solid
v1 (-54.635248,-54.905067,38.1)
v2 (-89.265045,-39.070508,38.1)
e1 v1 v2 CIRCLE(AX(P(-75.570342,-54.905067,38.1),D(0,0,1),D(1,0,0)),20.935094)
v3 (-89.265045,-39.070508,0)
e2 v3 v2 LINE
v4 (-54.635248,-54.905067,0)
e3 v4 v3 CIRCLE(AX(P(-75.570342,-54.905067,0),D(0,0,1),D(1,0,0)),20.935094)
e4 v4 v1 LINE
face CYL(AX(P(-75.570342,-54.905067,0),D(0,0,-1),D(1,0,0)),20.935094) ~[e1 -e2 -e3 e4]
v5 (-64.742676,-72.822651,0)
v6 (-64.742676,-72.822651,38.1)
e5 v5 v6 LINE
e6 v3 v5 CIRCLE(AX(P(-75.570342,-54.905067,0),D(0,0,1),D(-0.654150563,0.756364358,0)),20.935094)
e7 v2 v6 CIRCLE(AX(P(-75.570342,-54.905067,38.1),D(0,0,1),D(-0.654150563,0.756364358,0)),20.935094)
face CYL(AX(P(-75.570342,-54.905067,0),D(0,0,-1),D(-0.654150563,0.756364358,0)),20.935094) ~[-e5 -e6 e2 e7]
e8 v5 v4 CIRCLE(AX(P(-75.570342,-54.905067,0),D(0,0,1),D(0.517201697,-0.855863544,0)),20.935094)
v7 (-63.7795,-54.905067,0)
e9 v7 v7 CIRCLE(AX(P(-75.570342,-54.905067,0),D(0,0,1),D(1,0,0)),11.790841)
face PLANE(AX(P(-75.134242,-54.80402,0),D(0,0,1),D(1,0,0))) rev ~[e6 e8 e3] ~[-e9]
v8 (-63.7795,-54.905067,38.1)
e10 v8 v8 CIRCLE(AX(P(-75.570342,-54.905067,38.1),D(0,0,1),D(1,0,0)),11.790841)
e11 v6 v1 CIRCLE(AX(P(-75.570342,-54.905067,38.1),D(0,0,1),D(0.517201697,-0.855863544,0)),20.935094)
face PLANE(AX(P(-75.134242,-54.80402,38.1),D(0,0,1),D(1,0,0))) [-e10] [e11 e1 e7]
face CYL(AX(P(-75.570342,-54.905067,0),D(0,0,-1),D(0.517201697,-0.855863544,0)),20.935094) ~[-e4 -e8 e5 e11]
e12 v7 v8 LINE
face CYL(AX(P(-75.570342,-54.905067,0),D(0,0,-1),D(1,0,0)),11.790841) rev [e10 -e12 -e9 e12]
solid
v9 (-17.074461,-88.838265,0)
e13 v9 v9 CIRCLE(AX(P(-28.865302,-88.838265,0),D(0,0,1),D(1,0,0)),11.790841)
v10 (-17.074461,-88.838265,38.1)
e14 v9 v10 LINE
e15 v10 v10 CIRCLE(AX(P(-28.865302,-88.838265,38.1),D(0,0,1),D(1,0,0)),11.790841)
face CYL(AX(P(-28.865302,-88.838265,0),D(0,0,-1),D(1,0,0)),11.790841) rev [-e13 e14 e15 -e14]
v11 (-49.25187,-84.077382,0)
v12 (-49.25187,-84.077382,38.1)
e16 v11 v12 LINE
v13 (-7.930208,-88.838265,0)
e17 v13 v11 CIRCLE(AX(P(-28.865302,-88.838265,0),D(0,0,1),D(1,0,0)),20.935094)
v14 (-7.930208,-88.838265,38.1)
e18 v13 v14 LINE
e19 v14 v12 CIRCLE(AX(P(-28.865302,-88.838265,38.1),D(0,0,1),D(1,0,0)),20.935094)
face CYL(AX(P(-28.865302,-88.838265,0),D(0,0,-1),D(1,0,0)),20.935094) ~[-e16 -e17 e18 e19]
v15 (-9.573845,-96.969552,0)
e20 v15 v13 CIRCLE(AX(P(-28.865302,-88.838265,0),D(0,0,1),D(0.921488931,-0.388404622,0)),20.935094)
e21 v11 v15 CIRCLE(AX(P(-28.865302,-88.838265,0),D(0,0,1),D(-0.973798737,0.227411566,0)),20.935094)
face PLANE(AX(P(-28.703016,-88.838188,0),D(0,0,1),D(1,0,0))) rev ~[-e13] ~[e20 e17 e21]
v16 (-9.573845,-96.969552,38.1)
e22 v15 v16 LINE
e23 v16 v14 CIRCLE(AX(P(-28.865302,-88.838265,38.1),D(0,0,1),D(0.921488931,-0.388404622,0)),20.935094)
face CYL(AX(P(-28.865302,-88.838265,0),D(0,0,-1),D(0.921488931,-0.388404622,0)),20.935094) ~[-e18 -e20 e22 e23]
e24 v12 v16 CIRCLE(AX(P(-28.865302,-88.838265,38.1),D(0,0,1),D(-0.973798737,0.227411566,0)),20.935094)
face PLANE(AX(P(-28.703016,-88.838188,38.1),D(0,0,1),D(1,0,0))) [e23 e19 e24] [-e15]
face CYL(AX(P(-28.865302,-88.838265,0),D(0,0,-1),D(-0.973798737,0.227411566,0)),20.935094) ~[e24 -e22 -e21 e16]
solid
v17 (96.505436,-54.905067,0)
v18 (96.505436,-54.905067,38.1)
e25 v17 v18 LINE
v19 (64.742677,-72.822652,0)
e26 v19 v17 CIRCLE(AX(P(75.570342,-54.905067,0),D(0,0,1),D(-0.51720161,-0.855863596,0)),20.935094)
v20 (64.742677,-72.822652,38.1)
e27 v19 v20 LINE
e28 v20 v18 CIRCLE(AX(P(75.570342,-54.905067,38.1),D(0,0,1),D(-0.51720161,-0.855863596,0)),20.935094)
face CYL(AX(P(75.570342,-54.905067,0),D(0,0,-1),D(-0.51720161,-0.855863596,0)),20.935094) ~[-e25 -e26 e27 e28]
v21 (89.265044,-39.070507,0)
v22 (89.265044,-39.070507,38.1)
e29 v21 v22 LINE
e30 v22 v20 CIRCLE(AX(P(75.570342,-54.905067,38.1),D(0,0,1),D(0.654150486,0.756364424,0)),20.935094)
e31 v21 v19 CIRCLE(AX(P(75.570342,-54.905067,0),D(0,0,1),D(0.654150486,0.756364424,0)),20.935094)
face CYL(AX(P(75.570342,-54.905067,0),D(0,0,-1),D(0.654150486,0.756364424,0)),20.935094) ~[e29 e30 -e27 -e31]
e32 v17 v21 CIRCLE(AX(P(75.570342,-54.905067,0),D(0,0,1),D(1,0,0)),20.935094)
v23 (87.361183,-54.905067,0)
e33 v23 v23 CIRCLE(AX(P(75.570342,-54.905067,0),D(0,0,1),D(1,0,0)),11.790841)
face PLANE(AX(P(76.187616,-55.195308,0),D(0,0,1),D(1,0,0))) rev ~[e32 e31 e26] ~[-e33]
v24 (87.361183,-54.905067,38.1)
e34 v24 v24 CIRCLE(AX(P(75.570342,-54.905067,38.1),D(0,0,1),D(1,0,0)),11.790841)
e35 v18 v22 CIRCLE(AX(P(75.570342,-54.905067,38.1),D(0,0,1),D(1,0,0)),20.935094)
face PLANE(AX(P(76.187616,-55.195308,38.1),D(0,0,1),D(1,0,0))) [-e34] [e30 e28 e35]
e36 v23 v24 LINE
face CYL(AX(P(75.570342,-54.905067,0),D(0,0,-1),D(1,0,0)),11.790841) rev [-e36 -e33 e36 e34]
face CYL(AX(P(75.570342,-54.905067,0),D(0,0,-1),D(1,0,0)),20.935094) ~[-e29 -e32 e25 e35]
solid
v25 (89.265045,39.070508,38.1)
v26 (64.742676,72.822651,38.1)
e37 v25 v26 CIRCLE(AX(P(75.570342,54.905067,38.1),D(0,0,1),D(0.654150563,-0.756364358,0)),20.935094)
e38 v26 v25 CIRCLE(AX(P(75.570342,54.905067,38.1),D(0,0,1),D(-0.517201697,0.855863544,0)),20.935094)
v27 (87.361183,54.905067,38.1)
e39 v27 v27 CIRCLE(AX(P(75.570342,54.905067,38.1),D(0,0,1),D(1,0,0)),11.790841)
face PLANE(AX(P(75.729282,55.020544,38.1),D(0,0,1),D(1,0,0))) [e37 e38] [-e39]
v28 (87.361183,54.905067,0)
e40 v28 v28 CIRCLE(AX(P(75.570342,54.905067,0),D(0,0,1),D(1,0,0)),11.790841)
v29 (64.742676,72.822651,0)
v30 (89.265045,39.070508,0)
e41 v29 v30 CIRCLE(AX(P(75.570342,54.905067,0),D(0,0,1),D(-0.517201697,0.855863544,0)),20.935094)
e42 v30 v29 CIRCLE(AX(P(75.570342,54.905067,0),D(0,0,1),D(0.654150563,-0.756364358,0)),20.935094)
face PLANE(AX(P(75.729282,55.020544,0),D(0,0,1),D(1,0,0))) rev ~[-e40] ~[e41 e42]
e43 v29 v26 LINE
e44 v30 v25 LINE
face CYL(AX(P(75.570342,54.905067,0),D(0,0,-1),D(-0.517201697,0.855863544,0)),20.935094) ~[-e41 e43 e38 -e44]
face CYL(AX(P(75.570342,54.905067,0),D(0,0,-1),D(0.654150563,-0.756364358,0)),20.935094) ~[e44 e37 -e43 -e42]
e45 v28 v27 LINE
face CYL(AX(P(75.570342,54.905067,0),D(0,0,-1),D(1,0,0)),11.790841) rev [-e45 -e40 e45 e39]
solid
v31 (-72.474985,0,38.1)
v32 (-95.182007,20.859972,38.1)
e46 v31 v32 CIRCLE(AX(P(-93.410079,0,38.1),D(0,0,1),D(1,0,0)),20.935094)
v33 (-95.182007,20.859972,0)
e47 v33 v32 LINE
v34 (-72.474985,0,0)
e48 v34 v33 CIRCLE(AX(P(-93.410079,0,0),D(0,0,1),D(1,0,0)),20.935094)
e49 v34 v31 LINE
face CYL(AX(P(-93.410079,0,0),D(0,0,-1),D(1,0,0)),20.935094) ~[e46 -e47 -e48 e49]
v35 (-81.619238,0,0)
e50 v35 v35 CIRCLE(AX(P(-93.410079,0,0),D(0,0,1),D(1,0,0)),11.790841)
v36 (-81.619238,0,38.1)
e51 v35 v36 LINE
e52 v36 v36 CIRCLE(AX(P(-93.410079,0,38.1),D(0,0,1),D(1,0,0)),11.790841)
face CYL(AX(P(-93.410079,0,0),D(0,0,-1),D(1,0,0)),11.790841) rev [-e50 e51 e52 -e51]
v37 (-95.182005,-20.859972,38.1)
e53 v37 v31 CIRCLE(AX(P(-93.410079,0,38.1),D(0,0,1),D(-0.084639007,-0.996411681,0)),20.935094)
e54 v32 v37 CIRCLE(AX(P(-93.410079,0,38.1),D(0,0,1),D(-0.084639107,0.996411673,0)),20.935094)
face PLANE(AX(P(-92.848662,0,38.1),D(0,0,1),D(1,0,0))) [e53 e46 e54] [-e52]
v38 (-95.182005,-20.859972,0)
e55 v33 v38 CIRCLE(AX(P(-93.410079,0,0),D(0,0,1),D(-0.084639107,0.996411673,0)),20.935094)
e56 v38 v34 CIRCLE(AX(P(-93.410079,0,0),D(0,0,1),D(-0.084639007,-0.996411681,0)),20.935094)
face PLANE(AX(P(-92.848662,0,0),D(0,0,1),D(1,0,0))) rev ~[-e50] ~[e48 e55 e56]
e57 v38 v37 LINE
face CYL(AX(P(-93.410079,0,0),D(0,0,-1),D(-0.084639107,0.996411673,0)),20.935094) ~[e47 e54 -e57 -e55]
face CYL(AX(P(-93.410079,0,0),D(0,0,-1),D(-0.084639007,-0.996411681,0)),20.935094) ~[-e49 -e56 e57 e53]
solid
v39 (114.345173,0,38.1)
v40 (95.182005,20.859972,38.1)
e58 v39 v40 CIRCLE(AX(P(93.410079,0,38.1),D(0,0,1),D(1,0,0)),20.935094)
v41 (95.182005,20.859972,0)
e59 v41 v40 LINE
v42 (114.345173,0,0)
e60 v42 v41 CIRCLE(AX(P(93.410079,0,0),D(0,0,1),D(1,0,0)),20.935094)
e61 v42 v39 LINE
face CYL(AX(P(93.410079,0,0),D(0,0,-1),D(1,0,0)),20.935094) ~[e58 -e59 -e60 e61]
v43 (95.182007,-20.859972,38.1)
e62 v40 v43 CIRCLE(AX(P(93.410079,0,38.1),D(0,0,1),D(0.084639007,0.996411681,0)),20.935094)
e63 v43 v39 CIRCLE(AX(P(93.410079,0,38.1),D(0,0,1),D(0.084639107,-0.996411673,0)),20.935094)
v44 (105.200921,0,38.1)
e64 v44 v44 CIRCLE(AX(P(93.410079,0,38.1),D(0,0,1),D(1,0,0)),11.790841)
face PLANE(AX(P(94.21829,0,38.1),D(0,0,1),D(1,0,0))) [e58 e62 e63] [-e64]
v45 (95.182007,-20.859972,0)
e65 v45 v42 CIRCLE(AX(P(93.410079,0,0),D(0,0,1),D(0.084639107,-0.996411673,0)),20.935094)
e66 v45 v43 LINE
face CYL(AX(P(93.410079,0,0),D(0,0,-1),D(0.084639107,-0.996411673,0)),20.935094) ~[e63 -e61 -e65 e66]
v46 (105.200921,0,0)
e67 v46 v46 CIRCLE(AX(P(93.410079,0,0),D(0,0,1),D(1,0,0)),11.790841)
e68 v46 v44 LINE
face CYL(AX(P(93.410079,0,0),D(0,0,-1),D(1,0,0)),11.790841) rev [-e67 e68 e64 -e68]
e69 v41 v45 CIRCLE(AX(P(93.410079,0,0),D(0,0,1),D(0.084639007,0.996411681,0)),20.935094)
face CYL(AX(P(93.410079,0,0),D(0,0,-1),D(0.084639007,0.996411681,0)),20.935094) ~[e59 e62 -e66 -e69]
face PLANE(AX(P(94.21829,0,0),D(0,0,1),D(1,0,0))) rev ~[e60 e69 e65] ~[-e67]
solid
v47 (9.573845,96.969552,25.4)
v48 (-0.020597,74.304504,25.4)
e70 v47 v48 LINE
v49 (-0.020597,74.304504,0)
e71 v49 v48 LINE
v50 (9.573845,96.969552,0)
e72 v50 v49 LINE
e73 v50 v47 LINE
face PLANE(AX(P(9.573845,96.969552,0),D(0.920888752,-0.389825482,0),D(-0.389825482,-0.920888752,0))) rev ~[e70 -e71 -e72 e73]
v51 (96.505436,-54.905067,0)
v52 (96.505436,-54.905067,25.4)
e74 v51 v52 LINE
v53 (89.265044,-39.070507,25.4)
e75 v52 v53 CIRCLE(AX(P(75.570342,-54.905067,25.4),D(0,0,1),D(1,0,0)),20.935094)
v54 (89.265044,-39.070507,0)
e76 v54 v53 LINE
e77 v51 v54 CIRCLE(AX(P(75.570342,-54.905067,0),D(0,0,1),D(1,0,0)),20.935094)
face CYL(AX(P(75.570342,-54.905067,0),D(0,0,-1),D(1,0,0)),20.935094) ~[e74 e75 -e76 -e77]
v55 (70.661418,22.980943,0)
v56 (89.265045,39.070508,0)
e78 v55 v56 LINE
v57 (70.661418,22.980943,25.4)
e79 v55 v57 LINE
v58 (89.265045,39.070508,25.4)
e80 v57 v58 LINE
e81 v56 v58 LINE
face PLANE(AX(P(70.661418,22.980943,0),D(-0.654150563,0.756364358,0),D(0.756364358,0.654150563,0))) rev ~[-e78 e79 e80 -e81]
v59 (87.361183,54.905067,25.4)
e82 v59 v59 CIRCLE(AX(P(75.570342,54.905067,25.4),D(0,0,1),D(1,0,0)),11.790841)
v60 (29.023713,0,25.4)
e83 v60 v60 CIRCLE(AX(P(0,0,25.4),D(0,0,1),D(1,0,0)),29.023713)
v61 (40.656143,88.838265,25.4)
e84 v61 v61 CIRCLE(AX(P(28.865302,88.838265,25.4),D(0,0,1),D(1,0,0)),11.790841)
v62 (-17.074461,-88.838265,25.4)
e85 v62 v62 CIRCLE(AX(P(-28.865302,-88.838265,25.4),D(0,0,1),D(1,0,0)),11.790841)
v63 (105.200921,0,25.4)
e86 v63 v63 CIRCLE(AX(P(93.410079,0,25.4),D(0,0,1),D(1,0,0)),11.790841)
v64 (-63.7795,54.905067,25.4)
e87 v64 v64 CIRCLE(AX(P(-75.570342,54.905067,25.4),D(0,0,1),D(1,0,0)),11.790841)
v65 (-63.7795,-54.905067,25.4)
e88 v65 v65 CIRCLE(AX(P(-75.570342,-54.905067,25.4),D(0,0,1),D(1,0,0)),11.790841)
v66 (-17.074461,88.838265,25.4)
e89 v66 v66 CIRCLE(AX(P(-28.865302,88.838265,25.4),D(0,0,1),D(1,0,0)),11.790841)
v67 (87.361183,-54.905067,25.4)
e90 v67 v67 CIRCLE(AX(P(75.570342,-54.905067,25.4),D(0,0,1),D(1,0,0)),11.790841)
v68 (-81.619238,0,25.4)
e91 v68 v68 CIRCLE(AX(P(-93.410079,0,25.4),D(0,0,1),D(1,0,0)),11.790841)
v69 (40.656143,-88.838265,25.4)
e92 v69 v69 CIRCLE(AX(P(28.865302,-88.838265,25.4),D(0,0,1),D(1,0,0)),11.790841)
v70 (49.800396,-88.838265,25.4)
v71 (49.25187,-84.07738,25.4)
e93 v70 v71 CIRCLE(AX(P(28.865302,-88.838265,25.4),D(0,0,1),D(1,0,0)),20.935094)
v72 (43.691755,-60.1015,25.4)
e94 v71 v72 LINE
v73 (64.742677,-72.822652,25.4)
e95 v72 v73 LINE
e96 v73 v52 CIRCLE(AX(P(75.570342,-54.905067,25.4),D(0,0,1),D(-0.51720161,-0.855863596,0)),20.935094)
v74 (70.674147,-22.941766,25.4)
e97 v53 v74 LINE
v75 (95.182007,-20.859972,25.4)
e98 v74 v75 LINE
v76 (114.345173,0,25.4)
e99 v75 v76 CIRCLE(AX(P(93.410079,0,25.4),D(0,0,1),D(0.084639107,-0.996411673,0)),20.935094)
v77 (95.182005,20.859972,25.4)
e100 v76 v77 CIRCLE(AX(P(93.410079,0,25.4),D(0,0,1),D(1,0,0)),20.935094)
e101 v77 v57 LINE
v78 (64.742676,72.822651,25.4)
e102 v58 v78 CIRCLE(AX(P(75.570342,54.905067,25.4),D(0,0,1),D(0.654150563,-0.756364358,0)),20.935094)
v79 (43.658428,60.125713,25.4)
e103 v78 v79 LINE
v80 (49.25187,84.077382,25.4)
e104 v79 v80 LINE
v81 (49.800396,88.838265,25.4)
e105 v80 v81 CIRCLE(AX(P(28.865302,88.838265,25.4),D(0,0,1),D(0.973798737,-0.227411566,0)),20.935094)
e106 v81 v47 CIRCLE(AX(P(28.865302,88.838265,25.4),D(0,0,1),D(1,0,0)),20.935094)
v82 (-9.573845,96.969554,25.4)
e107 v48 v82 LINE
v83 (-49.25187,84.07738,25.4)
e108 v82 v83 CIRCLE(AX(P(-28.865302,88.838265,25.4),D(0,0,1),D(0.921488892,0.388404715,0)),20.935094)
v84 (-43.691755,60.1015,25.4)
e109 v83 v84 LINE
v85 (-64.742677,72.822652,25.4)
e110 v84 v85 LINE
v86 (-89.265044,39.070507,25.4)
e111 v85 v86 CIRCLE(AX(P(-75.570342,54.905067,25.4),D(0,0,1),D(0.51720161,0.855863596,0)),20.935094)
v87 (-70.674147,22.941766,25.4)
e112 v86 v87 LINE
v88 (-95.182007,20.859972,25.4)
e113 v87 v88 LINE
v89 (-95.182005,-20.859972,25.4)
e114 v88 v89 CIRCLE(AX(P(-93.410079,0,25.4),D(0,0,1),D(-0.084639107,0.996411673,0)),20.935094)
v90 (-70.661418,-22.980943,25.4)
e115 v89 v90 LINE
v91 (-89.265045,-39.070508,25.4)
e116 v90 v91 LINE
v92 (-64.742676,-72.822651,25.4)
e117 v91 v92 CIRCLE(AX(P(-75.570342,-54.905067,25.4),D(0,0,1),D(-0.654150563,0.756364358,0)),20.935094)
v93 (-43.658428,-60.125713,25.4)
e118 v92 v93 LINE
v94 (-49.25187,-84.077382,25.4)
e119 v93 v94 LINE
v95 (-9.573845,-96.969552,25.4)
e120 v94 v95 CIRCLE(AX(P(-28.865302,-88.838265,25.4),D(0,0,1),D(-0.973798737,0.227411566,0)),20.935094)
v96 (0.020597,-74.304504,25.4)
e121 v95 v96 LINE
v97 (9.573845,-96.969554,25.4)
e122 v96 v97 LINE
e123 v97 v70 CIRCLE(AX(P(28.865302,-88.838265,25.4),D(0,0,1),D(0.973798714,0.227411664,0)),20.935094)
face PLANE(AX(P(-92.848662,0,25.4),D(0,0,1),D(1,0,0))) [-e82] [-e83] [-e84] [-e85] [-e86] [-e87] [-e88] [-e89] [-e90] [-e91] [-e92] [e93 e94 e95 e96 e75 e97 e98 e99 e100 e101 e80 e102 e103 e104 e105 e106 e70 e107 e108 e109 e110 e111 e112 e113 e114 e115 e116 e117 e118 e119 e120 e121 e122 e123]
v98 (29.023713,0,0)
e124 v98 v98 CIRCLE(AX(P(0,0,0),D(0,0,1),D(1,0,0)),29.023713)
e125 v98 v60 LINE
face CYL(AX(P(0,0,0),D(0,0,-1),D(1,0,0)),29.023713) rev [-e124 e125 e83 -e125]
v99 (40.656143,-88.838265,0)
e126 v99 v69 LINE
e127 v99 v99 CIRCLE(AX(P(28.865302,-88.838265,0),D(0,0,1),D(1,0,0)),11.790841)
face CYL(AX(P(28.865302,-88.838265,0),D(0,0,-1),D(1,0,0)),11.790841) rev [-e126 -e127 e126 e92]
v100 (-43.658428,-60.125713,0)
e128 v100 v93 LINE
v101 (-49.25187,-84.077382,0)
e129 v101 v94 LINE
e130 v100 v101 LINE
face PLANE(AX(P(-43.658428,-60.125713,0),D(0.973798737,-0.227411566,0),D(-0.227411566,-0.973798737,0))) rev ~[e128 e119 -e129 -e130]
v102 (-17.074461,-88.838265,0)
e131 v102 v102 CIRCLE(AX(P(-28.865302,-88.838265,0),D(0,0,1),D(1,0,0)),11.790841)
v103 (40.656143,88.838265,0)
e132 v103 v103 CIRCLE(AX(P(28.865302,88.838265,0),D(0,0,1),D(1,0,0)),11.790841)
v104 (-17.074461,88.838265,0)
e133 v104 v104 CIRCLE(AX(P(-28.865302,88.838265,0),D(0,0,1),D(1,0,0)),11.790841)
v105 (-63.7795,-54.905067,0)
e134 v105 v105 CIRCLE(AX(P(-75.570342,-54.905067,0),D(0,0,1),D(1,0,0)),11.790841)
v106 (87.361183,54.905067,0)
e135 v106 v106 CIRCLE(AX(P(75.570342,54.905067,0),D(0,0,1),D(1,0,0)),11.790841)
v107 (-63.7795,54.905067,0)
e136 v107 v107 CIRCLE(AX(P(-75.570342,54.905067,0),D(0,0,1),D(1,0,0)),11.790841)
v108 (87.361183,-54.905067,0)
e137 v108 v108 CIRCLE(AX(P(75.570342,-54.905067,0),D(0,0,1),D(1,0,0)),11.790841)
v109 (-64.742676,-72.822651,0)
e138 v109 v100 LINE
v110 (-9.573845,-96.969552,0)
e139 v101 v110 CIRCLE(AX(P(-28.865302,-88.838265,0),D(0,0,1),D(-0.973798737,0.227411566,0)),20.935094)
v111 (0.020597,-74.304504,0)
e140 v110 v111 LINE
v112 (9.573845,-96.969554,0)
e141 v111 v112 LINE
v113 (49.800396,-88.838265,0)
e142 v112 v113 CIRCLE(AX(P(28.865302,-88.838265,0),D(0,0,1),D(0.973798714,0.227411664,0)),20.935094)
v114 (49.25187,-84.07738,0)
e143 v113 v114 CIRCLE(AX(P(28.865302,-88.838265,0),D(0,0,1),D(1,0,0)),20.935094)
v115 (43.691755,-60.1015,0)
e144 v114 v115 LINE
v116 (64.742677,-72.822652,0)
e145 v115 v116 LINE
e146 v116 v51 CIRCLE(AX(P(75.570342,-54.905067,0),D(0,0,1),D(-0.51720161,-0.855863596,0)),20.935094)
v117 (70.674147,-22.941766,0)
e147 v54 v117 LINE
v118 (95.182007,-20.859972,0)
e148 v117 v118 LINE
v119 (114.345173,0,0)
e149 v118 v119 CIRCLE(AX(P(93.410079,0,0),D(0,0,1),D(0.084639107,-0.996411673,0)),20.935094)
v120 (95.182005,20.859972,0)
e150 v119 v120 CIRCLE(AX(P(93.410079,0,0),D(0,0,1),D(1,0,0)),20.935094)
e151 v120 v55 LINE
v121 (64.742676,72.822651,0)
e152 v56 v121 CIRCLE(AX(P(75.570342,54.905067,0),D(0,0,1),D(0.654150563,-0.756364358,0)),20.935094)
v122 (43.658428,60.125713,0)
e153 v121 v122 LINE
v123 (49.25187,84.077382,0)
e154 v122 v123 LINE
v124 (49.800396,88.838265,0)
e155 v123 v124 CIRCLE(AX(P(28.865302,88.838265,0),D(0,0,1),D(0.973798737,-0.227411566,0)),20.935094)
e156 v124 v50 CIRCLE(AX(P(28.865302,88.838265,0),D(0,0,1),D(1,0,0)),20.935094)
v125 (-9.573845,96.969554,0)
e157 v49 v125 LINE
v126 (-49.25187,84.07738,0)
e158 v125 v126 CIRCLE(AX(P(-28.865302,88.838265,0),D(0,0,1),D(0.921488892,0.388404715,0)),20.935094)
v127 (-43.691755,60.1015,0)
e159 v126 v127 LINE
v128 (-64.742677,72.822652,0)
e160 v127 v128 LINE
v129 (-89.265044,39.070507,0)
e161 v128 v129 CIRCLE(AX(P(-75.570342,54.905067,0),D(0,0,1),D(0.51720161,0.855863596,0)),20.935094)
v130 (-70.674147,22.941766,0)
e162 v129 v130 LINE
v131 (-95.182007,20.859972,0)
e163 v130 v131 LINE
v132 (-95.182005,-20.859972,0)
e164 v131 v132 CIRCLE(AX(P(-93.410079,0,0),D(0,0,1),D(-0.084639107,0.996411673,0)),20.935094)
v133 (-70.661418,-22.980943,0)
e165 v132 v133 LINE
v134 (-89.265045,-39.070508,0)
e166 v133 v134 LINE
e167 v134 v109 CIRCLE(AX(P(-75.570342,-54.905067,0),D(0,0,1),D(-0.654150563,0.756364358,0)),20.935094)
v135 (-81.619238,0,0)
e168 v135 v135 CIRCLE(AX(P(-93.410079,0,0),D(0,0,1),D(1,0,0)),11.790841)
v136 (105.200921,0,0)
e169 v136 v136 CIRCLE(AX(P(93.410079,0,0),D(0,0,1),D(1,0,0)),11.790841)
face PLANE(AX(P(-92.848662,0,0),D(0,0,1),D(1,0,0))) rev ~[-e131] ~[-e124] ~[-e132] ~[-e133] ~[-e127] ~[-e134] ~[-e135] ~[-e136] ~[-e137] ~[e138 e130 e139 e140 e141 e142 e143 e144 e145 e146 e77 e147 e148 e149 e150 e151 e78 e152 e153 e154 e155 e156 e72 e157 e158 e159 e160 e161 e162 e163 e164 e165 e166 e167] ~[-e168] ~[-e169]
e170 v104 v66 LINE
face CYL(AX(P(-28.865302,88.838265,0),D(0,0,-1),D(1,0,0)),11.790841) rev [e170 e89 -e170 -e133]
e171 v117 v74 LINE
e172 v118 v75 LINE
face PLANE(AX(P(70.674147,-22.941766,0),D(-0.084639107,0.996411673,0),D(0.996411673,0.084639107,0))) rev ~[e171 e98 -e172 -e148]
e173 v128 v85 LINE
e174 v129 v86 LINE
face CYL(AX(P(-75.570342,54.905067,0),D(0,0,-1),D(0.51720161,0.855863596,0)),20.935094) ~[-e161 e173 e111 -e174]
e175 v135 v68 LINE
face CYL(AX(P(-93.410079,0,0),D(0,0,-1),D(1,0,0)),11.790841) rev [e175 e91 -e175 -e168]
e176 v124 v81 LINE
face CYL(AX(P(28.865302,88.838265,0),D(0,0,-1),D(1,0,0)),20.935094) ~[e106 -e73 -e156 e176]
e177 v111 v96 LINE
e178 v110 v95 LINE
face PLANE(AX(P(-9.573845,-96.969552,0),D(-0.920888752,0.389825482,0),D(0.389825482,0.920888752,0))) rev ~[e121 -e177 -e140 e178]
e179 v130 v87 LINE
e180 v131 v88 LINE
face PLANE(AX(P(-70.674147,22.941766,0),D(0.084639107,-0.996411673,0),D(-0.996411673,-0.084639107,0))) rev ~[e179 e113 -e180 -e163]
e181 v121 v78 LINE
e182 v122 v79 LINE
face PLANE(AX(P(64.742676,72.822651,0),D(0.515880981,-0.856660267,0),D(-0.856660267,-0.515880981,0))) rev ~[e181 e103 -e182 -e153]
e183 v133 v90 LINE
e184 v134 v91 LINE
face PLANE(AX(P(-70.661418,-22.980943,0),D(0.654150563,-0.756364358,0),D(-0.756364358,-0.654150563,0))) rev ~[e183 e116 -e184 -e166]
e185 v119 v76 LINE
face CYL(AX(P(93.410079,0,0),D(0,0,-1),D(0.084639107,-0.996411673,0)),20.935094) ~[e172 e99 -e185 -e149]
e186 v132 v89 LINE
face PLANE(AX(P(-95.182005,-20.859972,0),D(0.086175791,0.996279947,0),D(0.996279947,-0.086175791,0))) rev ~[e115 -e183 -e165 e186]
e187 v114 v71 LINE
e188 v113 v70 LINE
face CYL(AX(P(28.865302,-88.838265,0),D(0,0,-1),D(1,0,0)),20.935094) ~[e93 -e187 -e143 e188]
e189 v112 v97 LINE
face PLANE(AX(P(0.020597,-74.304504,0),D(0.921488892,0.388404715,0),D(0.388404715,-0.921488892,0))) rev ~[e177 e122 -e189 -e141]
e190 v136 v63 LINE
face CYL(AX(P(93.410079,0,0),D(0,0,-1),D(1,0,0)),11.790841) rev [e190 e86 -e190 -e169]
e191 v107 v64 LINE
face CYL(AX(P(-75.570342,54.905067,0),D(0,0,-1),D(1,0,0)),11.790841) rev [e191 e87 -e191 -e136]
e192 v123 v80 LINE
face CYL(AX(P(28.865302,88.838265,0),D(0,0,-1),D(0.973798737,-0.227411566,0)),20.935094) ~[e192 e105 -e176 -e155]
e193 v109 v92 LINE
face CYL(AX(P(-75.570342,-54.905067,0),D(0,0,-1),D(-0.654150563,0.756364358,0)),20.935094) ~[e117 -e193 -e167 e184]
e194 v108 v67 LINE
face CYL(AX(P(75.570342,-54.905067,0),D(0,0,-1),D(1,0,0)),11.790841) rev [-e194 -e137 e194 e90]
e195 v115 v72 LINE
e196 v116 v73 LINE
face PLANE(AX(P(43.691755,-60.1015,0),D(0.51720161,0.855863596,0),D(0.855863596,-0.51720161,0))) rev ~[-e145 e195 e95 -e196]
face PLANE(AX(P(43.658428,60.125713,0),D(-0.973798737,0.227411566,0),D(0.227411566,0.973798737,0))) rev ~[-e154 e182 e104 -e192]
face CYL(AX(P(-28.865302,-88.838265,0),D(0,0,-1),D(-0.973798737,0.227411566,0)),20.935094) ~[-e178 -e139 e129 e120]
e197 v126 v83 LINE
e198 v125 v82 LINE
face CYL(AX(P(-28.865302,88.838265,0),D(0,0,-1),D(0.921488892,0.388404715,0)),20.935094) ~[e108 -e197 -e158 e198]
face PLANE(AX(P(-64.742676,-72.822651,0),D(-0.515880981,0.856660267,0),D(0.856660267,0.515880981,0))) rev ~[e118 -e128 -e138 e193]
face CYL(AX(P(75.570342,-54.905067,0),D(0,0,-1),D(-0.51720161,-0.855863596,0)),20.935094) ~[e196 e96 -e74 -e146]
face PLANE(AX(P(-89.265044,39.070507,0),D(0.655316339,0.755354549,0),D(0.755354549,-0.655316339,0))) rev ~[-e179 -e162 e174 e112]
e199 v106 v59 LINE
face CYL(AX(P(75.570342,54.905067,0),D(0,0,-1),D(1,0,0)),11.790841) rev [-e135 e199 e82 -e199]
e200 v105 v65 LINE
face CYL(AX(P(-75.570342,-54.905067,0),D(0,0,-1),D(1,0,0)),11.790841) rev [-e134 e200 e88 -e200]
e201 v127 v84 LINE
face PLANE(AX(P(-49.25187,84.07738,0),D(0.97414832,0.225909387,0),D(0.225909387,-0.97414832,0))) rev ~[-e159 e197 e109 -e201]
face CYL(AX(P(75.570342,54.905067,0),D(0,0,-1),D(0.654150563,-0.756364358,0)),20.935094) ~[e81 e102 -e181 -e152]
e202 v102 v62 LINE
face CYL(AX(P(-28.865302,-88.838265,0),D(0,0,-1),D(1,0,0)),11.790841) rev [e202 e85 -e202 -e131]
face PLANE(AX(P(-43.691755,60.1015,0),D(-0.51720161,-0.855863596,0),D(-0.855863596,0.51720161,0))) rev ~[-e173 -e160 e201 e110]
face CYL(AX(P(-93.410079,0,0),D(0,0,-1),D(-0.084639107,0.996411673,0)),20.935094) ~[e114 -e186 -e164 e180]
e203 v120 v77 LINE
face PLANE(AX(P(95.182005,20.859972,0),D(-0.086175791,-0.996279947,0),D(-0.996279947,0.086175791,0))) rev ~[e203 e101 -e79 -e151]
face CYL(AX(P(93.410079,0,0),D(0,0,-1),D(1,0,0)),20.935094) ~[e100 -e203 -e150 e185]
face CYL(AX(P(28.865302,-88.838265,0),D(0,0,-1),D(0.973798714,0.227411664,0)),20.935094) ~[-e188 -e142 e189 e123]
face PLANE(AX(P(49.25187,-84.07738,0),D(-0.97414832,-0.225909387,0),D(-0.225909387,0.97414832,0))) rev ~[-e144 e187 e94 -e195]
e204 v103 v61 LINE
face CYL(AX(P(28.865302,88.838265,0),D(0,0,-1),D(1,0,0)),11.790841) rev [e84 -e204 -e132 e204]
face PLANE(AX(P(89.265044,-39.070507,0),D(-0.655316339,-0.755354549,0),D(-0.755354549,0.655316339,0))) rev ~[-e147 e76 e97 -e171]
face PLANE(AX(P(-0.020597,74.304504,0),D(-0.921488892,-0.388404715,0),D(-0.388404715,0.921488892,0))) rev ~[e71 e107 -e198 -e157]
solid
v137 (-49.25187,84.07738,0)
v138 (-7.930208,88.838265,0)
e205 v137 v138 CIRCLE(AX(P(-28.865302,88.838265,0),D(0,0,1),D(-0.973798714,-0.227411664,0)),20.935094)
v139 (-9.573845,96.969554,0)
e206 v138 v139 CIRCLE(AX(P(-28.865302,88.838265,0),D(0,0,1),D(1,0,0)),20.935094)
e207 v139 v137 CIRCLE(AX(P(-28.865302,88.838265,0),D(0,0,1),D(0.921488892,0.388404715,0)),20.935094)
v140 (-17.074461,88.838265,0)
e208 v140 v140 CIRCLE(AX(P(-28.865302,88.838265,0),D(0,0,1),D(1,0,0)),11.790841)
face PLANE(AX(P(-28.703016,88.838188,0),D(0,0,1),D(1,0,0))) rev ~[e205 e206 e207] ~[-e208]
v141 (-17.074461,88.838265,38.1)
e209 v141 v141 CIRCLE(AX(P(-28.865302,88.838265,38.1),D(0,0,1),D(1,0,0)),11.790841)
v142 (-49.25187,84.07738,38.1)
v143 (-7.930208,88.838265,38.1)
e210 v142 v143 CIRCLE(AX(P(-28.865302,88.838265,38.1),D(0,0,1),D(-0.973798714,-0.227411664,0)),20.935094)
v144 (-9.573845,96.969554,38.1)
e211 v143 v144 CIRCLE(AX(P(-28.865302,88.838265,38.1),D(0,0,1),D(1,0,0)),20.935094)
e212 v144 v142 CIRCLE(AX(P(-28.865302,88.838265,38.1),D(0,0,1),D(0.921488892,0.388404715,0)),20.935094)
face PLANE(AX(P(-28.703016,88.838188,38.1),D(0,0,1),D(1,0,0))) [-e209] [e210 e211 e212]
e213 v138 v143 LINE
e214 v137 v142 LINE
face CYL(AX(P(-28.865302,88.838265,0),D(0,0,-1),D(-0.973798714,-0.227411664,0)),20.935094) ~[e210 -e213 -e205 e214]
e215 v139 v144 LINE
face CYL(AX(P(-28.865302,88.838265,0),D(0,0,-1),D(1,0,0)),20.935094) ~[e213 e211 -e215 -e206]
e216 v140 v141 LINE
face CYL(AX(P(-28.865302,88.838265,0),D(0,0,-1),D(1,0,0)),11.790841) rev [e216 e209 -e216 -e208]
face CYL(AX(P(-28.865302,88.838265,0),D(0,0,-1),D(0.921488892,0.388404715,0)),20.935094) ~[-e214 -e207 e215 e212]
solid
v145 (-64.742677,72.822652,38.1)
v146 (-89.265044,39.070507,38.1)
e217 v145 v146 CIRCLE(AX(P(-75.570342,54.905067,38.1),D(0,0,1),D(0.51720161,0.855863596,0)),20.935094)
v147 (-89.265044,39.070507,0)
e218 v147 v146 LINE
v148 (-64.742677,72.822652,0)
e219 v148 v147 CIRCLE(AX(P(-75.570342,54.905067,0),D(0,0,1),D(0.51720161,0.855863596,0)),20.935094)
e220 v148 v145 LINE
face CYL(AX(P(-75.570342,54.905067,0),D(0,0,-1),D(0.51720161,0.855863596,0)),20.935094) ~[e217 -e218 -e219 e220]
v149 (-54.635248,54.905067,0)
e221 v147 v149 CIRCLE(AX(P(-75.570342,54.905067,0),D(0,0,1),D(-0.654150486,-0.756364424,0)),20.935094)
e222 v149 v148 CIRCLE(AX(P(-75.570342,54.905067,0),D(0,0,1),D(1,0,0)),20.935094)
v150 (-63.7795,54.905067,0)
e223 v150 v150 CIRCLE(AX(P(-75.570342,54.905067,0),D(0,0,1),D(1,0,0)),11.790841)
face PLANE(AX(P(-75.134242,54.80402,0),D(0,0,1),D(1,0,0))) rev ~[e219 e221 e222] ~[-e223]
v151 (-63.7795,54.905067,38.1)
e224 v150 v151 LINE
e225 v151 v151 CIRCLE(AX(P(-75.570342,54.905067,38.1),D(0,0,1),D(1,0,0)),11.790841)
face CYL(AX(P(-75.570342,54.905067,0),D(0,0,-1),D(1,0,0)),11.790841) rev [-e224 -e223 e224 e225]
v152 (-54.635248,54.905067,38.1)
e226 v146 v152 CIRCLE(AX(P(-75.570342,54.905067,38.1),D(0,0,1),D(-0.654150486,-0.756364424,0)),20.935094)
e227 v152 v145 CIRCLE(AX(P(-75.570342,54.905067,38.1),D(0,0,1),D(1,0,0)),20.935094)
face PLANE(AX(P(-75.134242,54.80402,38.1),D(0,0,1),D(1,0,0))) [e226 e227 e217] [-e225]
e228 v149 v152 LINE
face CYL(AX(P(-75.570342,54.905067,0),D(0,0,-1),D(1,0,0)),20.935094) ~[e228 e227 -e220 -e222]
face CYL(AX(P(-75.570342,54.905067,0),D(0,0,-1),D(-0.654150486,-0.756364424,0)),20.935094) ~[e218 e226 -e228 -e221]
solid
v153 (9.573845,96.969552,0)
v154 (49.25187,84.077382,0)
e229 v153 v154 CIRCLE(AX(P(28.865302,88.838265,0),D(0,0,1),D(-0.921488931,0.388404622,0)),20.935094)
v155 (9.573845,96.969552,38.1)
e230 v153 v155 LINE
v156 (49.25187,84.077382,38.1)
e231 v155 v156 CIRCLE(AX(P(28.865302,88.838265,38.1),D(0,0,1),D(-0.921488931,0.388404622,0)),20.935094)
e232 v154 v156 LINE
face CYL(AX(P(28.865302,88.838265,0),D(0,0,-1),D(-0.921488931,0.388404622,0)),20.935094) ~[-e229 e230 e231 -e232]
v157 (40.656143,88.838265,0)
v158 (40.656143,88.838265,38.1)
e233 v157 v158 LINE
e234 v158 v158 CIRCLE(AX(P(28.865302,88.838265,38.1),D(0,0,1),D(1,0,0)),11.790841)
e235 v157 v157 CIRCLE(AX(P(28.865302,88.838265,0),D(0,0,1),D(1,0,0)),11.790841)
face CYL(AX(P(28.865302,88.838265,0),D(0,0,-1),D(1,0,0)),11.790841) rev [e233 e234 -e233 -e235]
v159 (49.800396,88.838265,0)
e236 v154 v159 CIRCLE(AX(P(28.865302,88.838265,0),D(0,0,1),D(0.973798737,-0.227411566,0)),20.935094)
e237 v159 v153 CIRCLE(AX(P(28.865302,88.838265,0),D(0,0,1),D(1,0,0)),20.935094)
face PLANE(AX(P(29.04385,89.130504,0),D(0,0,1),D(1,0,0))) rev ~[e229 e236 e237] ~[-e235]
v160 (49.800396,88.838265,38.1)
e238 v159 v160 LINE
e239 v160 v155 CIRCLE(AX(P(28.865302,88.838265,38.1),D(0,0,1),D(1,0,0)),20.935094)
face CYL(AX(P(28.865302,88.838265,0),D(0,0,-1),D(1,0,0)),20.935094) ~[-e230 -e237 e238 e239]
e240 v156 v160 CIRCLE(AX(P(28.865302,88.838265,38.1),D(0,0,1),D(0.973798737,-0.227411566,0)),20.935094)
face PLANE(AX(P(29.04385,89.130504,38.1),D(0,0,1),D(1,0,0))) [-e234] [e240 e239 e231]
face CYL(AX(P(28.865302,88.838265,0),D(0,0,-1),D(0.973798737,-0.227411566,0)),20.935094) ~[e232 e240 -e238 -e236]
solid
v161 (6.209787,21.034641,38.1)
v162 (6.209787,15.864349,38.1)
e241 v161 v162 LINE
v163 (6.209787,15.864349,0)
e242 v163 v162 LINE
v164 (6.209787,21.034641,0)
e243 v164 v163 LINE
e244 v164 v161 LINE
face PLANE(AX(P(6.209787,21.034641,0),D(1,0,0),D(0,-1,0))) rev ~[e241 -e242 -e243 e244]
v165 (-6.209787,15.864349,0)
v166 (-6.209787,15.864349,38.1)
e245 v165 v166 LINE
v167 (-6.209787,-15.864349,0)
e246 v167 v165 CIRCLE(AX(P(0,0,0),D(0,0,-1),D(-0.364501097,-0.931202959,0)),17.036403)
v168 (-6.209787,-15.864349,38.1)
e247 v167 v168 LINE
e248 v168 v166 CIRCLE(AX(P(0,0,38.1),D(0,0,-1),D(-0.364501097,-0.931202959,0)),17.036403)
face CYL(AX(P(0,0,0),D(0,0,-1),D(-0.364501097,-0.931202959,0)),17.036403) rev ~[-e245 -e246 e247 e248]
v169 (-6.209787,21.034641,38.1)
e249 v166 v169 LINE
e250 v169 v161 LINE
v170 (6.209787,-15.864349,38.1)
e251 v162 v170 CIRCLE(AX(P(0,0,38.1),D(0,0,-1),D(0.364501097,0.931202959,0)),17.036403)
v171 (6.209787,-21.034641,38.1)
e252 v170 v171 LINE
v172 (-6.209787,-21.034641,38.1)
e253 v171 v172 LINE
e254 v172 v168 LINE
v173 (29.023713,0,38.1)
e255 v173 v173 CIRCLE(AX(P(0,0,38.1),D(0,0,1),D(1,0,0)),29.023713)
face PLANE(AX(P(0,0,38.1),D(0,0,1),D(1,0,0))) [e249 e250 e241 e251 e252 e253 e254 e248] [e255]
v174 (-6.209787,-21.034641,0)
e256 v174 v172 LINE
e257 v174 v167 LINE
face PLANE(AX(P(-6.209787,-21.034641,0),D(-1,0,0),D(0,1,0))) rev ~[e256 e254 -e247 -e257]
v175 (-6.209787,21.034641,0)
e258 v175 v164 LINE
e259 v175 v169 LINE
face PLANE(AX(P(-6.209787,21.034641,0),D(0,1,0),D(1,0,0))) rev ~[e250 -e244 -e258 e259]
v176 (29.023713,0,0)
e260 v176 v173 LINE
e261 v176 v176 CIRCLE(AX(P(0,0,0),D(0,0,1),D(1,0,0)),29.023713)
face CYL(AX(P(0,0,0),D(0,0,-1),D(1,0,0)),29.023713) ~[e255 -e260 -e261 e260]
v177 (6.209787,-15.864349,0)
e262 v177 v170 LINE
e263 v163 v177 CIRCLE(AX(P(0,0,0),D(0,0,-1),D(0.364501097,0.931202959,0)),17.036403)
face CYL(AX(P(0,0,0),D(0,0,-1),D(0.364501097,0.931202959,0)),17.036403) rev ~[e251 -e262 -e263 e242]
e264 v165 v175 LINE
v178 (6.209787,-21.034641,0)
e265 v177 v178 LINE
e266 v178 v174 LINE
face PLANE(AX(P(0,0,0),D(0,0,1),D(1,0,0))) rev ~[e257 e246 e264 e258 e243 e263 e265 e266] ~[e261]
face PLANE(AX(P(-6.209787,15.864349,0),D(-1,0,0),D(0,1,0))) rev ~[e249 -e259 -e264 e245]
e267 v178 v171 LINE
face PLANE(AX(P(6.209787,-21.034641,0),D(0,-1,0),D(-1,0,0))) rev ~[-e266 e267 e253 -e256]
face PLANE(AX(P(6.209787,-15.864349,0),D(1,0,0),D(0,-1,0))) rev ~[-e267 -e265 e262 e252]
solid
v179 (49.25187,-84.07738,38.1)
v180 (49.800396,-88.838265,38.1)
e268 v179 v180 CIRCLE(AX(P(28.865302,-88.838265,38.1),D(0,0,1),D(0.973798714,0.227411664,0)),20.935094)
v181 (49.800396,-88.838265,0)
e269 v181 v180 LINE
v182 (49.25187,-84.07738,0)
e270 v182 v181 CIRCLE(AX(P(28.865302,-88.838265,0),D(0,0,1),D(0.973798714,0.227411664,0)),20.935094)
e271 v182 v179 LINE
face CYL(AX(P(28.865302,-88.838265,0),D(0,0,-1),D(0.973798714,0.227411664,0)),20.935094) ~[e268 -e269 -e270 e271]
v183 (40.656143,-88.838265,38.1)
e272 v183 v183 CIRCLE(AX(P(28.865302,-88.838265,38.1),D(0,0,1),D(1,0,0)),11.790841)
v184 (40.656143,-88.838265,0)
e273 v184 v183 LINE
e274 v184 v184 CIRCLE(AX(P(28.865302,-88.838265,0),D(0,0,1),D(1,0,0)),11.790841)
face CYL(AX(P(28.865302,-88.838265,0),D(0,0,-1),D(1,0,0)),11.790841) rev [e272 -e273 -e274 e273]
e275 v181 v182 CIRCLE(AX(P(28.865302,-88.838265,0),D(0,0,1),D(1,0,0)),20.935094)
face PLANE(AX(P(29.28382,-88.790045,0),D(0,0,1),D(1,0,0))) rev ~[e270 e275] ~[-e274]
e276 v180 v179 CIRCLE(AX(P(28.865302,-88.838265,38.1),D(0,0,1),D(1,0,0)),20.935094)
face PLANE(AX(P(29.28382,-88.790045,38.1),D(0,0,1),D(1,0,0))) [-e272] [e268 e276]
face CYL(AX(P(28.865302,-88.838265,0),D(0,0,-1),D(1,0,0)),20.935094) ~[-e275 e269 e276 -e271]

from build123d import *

# Parameters (mm, degrees)
F0_R     = 11.7908412462
F1_DEPTH = 38.1
F0_R_2   = 29.023712578
F2_DEPTH = 25.4


# Not quite as in the source:
# - ends of sketch curves that miss each other by under 0.0002 mm in the source are joined


with BuildPart() as f1:
    # F0 (on Top) → F1 (new body)
    with BuildSketch(Plane.XY):
        with BuildLine():
            ThreePointArc((-64.7426773936, 72.8226518828), (-92.507189101, 67.2104057225), (-89.2650435852, 39.0705068284))
            ThreePointArc((-89.2650435852, 39.0705068284), (-66.8646456266, 35.8659228211), (-54.6352477424, 54.9050670968))
            ThreePointArc((-54.6352477424, 54.9050670968), (-57.3363579251, 65.1909795347), (-64.7426773936, 72.8226518828))
        make_face()
        with Locations((-75.5703416943, 54.9050670968)):
            Circle(F0_R, mode=Mode.SUBTRACT)
    extrude(amount=F1_DEPTH)


with BuildPart() as f1b:
    # F0 (on Top) → F1, piece 2 (new body)
    with BuildSketch(Plane.XY):
        with BuildLine():
            ThreePointArc((-95.1820049773, -20.8599721616), (-79.2470513034, -15.4170941953), (-72.4749854651, 0))
            ThreePointArc((-72.4749854651, 0), (-79.2470520813, 15.4170949099), (-95.1820070823, 20.8599719828))
            ThreePointArc((-95.1820070823, 20.8599719828), (-114.3451733689, -1.0563e-06), (-95.1820049773, -20.8599721616))
        make_face()
        with Locations((-93.410079417, 0)):
            Circle(F0_R, mode=Mode.SUBTRACT)
    extrude(amount=F1_DEPTH)


with BuildPart() as f1c:
    # F0 (on Top) → F1, piece 3 (new body)
    with BuildSketch(Plane.XY):
        with BuildLine():
            ThreePointArc((-54.6352477424, -54.9050670968), (-66.8646465872, -35.8659223818), (-89.265045183, -39.0705082103))
            ThreePointArc((-89.265045183, -39.0705082103), (-92.5071878593, -67.2104074316), (-64.7426755855, -72.8226507902))
            ThreePointArc((-64.7426755855, -72.8226507902), (-57.3363574061, -65.1909786147), (-54.6352477424, -54.9050670968))
        make_face()
        with Locations((-75.5703416943, -54.9050670968)):
            Circle(F0_R, mode=Mode.SUBTRACT)
    extrude(amount=F1_DEPTH)


with BuildPart() as f1d:
    # F0 (on Top) → F1, piece 4 (new body)
    with BuildSketch(Plane.XY):
        with BuildLine():
            ThreePointArc((-7.9302080339, -88.8382647172), (-26.4691132006, -68.0407543354), (-49.2518700311, -84.0773822248))
            ThreePointArc((-49.2518700311, -84.0773822248), (-35.3346007911, -108.7487225658), (-9.5738446427, -96.9695519678))
            ThreePointArc((-9.5738446427, -96.9695519678), (-8.3452309489, -92.9861368721), (-7.9302080339, -88.8382647172))
        make_face()
        with Locations((-28.8653019858, -88.8382647172)):
            Circle(F0_R, mode=Mode.SUBTRACT)
    extrude(amount=F1_DEPTH)


with BuildPart() as f1e:
    # F0 (on Top) → F1, piece 5 (new body)
    with BuildSketch(Plane.XY):
        with BuildLine():
            ThreePointArc((49.2518695507, -84.0773801676), (22.3960011712, -68.9278075214), (9.5738454632, -96.9695539146))
            ThreePointArc((9.5738454632, -96.9695539146), (33.013175176, -109.3583355448), (49.8003959376, -88.8382647172))
            ThreePointArc((49.8003959376, -88.8382647172), (49.6628122466, -86.4420748827), (49.2518695507, -84.0773801676))
        make_face()
        with Locations((28.8653019858, -88.8382647172)):
            Circle(F0_R, mode=Mode.SUBTRACT)
    extrude(amount=F1_DEPTH)


with BuildPart() as f1f:
    # F0 (on Top) → F1, piece 6 (new body)
    with BuildSketch(Plane.XY):
        with BuildLine():
            ThreePointArc((89.2650435852, -39.0705068284), (58.6334942875, -42.5997284711), (64.7426773936, -72.8226518828))
            ThreePointArc((64.7426773936, -72.8226518828), (85.8562541322, -73.1390508659), (96.5054356461, -54.9050670968))
            ThreePointArc((96.5054356461, -54.9050670968), (94.60948597, -46.1993710291), (89.2650435852, -39.0705068284))
        make_face()
        with Locations((75.5703416943, -54.9050670968)):
            Circle(F0_R, mode=Mode.SUBTRACT)
    extrude(amount=F1_DEPTH)


with BuildPart() as f1g:
    # F0 (on Top) → F1, piece 7 (new body)
    with BuildSketch(Plane.XY):
        with BuildLine():
            ThreePointArc((114.3451733689, 0), (108.8271736123, 14.1630281136), (95.1820049773, 20.8599721616))
            ThreePointArc((95.1820049773, 20.8599721616), (72.4749854651, -1.0563e-06), (95.1820070823, -20.8599719828))
            ThreePointArc((95.1820070823, -20.8599719828), (108.8271743269, -14.1630273357), (114.3451733689, 0))
        make_face()
        with Locations((93.410079417, 0)):
            Circle(F0_R, mode=Mode.SUBTRACT)
    extrude(amount=F1_DEPTH)


with BuildPart() as f1h:
    # F0 (on Top) → F1, piece 8 (new body)
    with BuildSketch(Plane.XY):
        Circle(F0_R_2)
        with BuildLine():
            ThreePointArc((-6.209787447, -15.8643485108), (-17.0364026076, 0), (-6.209787447, 15.8643485108))
            Line((-6.209787447, 15.8643485108), (-6.209787447, 21.0346411914))
            Line((-6.209787447, 21.0346411914), (6.209787447, 21.0346411914))
            Line((6.209787447, 21.0346411914), (6.209787447, 15.8643485108))
            ThreePointArc((6.209787447, 15.8643485108), (17.0364026076, 0), (6.209787447, -15.8643485108))
            Line((6.209787447, -15.8643485108), (6.209787447, -21.0346411914))
            Line((6.209787447, -21.0346411914), (-6.209787447, -21.0346411914))
            Line((-6.209787447, -21.0346411914), (-6.209787447, -15.8643485108))
        make_face(mode=Mode.SUBTRACT)
    extrude(amount=F1_DEPTH)


with BuildPart() as f1i:
    # F0 (on Top) → F1, piece 9 (new body)
    with BuildSketch(Plane.XY):
        with BuildLine():
            ThreePointArc((96.5054356461, 54.9050670968), (85.8562532122, 73.1390513849), (64.7426755855, 72.8226507902))
            ThreePointArc((64.7426755855, 72.8226507902), (58.6334955292, 42.599726762), (89.265045183, 39.0705082103))
            ThreePointArc((89.265045183, 39.0705082103), (94.6094864092, 46.1993719898), (96.5054356461, 54.9050670968))
        make_face()
        with Locations((75.5703416943, 54.9050670968)):
            Circle(F0_R, mode=Mode.SUBTRACT)
    extrude(amount=F1_DEPTH)


with BuildPart() as f1j:
    # F0 (on Top) → F1, piece 10 (new body)
    with BuildSketch(Plane.XY):
        with BuildLine():
            ThreePointArc((49.8003959376, 88.8382647172), (33.0131741407, 109.3583357541), (9.5738446427, 96.9695519678))
            ThreePointArc((9.5738446427, 96.9695519678), (22.3960031804, 68.9278068686), (49.2518700311, 84.0773822248))
            ThreePointArc((49.2518700311, 84.0773822248), (49.6628123675, 86.4420759321), (49.8003959376, 88.8382647172))
        make_face()
        with Locations((28.8653019858, 88.8382647172)):
            Circle(F0_R, mode=Mode.SUBTRACT)
    extrude(amount=F1_DEPTH)


with BuildPart() as f1k:
    # F0 (on Top) → F1, piece 11 (new body)
    with BuildSketch(Plane.XY):
        with BuildLine():
            ThreePointArc((-9.5738454632, 96.9695539146), (-35.3346028003, 108.7487219129), (-49.2518695507, 84.0773801676))
            ThreePointArc((-49.2518695507, 84.0773801676), (-26.4691121513, 68.0407544563), (-7.9302080339, 88.8382647172))
            ThreePointArc((-7.9302080339, 88.8382647172), (-8.3452311581, 92.9861379075), (-9.5738454632, 96.9695539146))
        make_face()
        with Locations((-28.8653019858, 88.8382647172)):
            Circle(F0_R, mode=Mode.SUBTRACT)
    extrude(amount=F1_DEPTH)


with BuildPart() as f2:
    # F0 (on Top) → F2 (new body)
    with BuildSketch(Plane.XY):
        with BuildLine():
            ThreePointArc((-95.1820049773, -20.8599721616), (-79.2470513034, -15.4170941953), (-72.4749854651, 0))
            ThreePointArc((-72.4749854651, 0), (-79.2470520813, 15.4170949099), (-95.1820070823, 20.8599719828))
            ThreePointArc((-95.1820070823, 20.8599719828), (-114.3451733689, -1.0563e-06), (-95.1820049773, -20.8599721616))
        make_face()
        with Locations((-93.410079417, 0)):
            Circle(F0_R, mode=Mode.SUBTRACT)
        with BuildLine():
            ThreePointArc((-95.1820070823, 20.8599719828), (-79.2470520813, 15.4170949099), (-72.4749854651, 0))
            ThreePointArc((-72.4749854651, 0), (-79.2470513034, -15.4170941953), (-95.1820049773, -20.8599721616))
            Line((-95.1820049773, -20.8599721616), (-70.6614176311, -22.9809432931))
            Line((-70.6614176311, -22.9809432931), (-89.265045183, -39.0705082103))
            ThreePointArc((-89.265045183, -39.0705082103), (-66.8646465872, -35.8659223818), (-54.6352477424, -54.9050670968))
            ThreePointArc((-54.6352477424, -54.9050670968), (-57.3363574061, -65.1909786147), (-64.7426755855, -72.8226507902))
            Line((-64.7426755855, -72.8226507902), (-43.6584281587, -60.1257128606))
            Line((-43.6584281587, -60.1257128606), (-49.2518700311, -84.0773822248))
            ThreePointArc((-49.2518700311, -84.0773822248), (-26.4691132006, -68.0407543354), (-7.9302080339, -88.8382647172))
            ThreePointArc((-7.9302080339, -88.8382647172), (-8.3452309489, -92.9861368721), (-9.5738446427, -96.9695519678))
            Line((-9.5738446427, -96.9695519678), (0.0205969749, -74.3045037131))
            Line((0.0205969749, -74.3045037131), (9.5738454632, -96.9695539146))
            ThreePointArc((9.5738454632, -96.9695539146), (22.3960011712, -68.9278075214), (49.2518695507, -84.0773801676))
            Line((49.2518695507, -84.0773801676), (43.6917547642, -60.1014996644))
            Line((43.6917547642, -60.1014996644), (64.7426773936, -72.8226518828))
            ThreePointArc((64.7426773936, -72.8226518828), (58.6334942875, -42.5997284711), (89.2650435852, -39.0705068284))
            Line((89.2650435852, -39.0705068284), (70.6741472617, -22.9417655187))
            Line((70.6741472617, -22.9417655187), (95.1820070823, -20.8599719828))
            ThreePointArc((95.1820070823, -20.8599719828), (72.4749854651, -1.0563e-06), (95.1820049773, 20.8599721616))
            Line((95.1820049773, 20.8599721616), (70.6614176311, 22.9809432931))
            Line((70.6614176311, 22.9809432931), (89.265045183, 39.0705082103))
            ThreePointArc((89.265045183, 39.0705082103), (58.6334955292, 42.599726762), (64.7426755855, 72.8226507902))
            Line((64.7426755855, 72.8226507902), (43.6584281587, 60.1257128606))
            Line((43.6584281587, 60.1257128606), (49.2518700311, 84.0773822248))
            ThreePointArc((49.2518700311, 84.0773822248), (22.3960031804, 68.9278068686), (9.5738446427, 96.9695519678))
            Line((9.5738446427, 96.9695519678), (-0.0205969749, 74.3045037131))
            Line((-0.0205969749, 74.3045037131), (-9.5738454632, 96.9695539146))
            ThreePointArc((-9.5738454632, 96.9695539146), (-8.3452311581, 92.9861379075), (-7.9302080339, 88.8382647172))
            ThreePointArc((-7.9302080339, 88.8382647172), (-26.4691121513, 68.0407544563), (-49.2518695507, 84.0773801676))
            Line((-49.2518695507, 84.0773801676), (-43.6917547642, 60.1014996644))
            Line((-43.6917547642, 60.1014996644), (-64.7426773936, 72.8226518828))
            ThreePointArc((-64.7426773936, 72.8226518828), (-57.3363579251, 65.1909795347), (-54.6352477424, 54.9050670968))
            ThreePointArc((-54.6352477424, 54.9050670968), (-66.8646456266, 35.8659228211), (-89.2650435852, 39.0705068284))
            Line((-89.2650435852, 39.0705068284), (-70.6741472617, 22.9417655187))
            Line((-70.6741472617, 22.9417655187), (-95.1820070823, 20.8599719828))
        make_face()
        Circle(F0_R_2, mode=Mode.SUBTRACT)
        with BuildLine():
            ThreePointArc((-64.7426773936, 72.8226518828), (-92.507189101, 67.2104057225), (-89.2650435852, 39.0705068284))
            ThreePointArc((-89.2650435852, 39.0705068284), (-66.8646456266, 35.8659228211), (-54.6352477424, 54.9050670968))
            ThreePointArc((-54.6352477424, 54.9050670968), (-57.3363579251, 65.1909795347), (-64.7426773936, 72.8226518828))
        make_face()
        with Locations((-75.5703416943, 54.9050670968)):
            Circle(F0_R, mode=Mode.SUBTRACT)
        with BuildLine():
            ThreePointArc((-54.6352477424, -54.9050670968), (-66.8646465872, -35.8659223818), (-89.265045183, -39.0705082103))
            ThreePointArc((-89.265045183, -39.0705082103), (-92.5071878593, -67.2104074316), (-64.7426755855, -72.8226507902))
            ThreePointArc((-64.7426755855, -72.8226507902), (-57.3363574061, -65.1909786147), (-54.6352477424, -54.9050670968))
        make_face()
        with Locations((-75.5703416943, -54.9050670968)):
            Circle(F0_R, mode=Mode.SUBTRACT)
        with BuildLine():
            ThreePointArc((-9.5738454632, 96.9695539146), (-35.3346028003, 108.7487219129), (-49.2518695507, 84.0773801676))
            ThreePointArc((-49.2518695507, 84.0773801676), (-26.4691121513, 68.0407544563), (-7.9302080339, 88.8382647172))
            ThreePointArc((-7.9302080339, 88.8382647172), (-8.3452311581, 92.9861379075), (-9.5738454632, 96.9695539146))
        make_face()
        with Locations((-28.8653019858, 88.8382647172)):
            Circle(F0_R, mode=Mode.SUBTRACT)
        with BuildLine():
            ThreePointArc((-7.9302080339, -88.8382647172), (-26.4691132006, -68.0407543354), (-49.2518700311, -84.0773822248))
            ThreePointArc((-49.2518700311, -84.0773822248), (-35.3346007911, -108.7487225658), (-9.5738446427, -96.9695519678))
            ThreePointArc((-9.5738446427, -96.9695519678), (-8.3452309489, -92.9861368721), (-7.9302080339, -88.8382647172))
        make_face()
        with Locations((-28.8653019858, -88.8382647172)):
            Circle(F0_R, mode=Mode.SUBTRACT)
        with BuildLine():
            ThreePointArc((49.8003959376, 88.8382647172), (33.0131741407, 109.3583357541), (9.5738446427, 96.9695519678))
            ThreePointArc((9.5738446427, 96.9695519678), (22.3960031804, 68.9278068686), (49.2518700311, 84.0773822248))
            ThreePointArc((49.2518700311, 84.0773822248), (49.6628123675, 86.4420759321), (49.8003959376, 88.8382647172))
        make_face()
        with Locations((28.8653019858, 88.8382647172)):
            Circle(F0_R, mode=Mode.SUBTRACT)
        with BuildLine():
            ThreePointArc((49.2518695507, -84.0773801676), (22.3960011712, -68.9278075214), (9.5738454632, -96.9695539146))
            ThreePointArc((9.5738454632, -96.9695539146), (33.013175176, -109.3583355448), (49.8003959376, -88.8382647172))
            ThreePointArc((49.8003959376, -88.8382647172), (49.6628122466, -86.4420748827), (49.2518695507, -84.0773801676))
        make_face()
        with Locations((28.8653019858, -88.8382647172)):
            Circle(F0_R, mode=Mode.SUBTRACT)
        with BuildLine():
            ThreePointArc((96.5054356461, 54.9050670968), (85.8562532122, 73.1390513849), (64.7426755855, 72.8226507902))
            ThreePointArc((64.7426755855, 72.8226507902), (58.6334955292, 42.599726762), (89.265045183, 39.0705082103))
            ThreePointArc((89.265045183, 39.0705082103), (94.6094864092, 46.1993719898), (96.5054356461, 54.9050670968))
        make_face()
        with Locations((75.5703416943, 54.9050670968)):
            Circle(F0_R, mode=Mode.SUBTRACT)
        with BuildLine():
            ThreePointArc((89.2650435852, -39.0705068284), (58.6334942875, -42.5997284711), (64.7426773936, -72.8226518828))
            ThreePointArc((64.7426773936, -72.8226518828), (85.8562541322, -73.1390508659), (96.5054356461, -54.9050670968))
            ThreePointArc((96.5054356461, -54.9050670968), (94.60948597, -46.1993710291), (89.2650435852, -39.0705068284))
        make_face()
        with Locations((75.5703416943, -54.9050670968)):
            Circle(F0_R, mode=Mode.SUBTRACT)
        with BuildLine():
            ThreePointArc((114.3451733689, 0), (108.8271736123, 14.1630281136), (95.1820049773, 20.8599721616))
            ThreePointArc((95.1820049773, 20.8599721616), (72.4749854651, -1.0563e-06), (95.1820070823, -20.8599719828))
            ThreePointArc((95.1820070823, -20.8599719828), (108.8271743269, -14.1630273357), (114.3451733689, 0))
        make_face()
        with Locations((93.410079417, 0)):
            Circle(F0_R, mode=Mode.SUBTRACT)
    extrude(amount=F2_DEPTH)


solid = Compound([f1.part, f1b.part, f1c.part, f1d.part, f1e.part, f1f.part, f1g.part, f1h.part, f1i.part, f1j.part, f1k.part, f2.part])
